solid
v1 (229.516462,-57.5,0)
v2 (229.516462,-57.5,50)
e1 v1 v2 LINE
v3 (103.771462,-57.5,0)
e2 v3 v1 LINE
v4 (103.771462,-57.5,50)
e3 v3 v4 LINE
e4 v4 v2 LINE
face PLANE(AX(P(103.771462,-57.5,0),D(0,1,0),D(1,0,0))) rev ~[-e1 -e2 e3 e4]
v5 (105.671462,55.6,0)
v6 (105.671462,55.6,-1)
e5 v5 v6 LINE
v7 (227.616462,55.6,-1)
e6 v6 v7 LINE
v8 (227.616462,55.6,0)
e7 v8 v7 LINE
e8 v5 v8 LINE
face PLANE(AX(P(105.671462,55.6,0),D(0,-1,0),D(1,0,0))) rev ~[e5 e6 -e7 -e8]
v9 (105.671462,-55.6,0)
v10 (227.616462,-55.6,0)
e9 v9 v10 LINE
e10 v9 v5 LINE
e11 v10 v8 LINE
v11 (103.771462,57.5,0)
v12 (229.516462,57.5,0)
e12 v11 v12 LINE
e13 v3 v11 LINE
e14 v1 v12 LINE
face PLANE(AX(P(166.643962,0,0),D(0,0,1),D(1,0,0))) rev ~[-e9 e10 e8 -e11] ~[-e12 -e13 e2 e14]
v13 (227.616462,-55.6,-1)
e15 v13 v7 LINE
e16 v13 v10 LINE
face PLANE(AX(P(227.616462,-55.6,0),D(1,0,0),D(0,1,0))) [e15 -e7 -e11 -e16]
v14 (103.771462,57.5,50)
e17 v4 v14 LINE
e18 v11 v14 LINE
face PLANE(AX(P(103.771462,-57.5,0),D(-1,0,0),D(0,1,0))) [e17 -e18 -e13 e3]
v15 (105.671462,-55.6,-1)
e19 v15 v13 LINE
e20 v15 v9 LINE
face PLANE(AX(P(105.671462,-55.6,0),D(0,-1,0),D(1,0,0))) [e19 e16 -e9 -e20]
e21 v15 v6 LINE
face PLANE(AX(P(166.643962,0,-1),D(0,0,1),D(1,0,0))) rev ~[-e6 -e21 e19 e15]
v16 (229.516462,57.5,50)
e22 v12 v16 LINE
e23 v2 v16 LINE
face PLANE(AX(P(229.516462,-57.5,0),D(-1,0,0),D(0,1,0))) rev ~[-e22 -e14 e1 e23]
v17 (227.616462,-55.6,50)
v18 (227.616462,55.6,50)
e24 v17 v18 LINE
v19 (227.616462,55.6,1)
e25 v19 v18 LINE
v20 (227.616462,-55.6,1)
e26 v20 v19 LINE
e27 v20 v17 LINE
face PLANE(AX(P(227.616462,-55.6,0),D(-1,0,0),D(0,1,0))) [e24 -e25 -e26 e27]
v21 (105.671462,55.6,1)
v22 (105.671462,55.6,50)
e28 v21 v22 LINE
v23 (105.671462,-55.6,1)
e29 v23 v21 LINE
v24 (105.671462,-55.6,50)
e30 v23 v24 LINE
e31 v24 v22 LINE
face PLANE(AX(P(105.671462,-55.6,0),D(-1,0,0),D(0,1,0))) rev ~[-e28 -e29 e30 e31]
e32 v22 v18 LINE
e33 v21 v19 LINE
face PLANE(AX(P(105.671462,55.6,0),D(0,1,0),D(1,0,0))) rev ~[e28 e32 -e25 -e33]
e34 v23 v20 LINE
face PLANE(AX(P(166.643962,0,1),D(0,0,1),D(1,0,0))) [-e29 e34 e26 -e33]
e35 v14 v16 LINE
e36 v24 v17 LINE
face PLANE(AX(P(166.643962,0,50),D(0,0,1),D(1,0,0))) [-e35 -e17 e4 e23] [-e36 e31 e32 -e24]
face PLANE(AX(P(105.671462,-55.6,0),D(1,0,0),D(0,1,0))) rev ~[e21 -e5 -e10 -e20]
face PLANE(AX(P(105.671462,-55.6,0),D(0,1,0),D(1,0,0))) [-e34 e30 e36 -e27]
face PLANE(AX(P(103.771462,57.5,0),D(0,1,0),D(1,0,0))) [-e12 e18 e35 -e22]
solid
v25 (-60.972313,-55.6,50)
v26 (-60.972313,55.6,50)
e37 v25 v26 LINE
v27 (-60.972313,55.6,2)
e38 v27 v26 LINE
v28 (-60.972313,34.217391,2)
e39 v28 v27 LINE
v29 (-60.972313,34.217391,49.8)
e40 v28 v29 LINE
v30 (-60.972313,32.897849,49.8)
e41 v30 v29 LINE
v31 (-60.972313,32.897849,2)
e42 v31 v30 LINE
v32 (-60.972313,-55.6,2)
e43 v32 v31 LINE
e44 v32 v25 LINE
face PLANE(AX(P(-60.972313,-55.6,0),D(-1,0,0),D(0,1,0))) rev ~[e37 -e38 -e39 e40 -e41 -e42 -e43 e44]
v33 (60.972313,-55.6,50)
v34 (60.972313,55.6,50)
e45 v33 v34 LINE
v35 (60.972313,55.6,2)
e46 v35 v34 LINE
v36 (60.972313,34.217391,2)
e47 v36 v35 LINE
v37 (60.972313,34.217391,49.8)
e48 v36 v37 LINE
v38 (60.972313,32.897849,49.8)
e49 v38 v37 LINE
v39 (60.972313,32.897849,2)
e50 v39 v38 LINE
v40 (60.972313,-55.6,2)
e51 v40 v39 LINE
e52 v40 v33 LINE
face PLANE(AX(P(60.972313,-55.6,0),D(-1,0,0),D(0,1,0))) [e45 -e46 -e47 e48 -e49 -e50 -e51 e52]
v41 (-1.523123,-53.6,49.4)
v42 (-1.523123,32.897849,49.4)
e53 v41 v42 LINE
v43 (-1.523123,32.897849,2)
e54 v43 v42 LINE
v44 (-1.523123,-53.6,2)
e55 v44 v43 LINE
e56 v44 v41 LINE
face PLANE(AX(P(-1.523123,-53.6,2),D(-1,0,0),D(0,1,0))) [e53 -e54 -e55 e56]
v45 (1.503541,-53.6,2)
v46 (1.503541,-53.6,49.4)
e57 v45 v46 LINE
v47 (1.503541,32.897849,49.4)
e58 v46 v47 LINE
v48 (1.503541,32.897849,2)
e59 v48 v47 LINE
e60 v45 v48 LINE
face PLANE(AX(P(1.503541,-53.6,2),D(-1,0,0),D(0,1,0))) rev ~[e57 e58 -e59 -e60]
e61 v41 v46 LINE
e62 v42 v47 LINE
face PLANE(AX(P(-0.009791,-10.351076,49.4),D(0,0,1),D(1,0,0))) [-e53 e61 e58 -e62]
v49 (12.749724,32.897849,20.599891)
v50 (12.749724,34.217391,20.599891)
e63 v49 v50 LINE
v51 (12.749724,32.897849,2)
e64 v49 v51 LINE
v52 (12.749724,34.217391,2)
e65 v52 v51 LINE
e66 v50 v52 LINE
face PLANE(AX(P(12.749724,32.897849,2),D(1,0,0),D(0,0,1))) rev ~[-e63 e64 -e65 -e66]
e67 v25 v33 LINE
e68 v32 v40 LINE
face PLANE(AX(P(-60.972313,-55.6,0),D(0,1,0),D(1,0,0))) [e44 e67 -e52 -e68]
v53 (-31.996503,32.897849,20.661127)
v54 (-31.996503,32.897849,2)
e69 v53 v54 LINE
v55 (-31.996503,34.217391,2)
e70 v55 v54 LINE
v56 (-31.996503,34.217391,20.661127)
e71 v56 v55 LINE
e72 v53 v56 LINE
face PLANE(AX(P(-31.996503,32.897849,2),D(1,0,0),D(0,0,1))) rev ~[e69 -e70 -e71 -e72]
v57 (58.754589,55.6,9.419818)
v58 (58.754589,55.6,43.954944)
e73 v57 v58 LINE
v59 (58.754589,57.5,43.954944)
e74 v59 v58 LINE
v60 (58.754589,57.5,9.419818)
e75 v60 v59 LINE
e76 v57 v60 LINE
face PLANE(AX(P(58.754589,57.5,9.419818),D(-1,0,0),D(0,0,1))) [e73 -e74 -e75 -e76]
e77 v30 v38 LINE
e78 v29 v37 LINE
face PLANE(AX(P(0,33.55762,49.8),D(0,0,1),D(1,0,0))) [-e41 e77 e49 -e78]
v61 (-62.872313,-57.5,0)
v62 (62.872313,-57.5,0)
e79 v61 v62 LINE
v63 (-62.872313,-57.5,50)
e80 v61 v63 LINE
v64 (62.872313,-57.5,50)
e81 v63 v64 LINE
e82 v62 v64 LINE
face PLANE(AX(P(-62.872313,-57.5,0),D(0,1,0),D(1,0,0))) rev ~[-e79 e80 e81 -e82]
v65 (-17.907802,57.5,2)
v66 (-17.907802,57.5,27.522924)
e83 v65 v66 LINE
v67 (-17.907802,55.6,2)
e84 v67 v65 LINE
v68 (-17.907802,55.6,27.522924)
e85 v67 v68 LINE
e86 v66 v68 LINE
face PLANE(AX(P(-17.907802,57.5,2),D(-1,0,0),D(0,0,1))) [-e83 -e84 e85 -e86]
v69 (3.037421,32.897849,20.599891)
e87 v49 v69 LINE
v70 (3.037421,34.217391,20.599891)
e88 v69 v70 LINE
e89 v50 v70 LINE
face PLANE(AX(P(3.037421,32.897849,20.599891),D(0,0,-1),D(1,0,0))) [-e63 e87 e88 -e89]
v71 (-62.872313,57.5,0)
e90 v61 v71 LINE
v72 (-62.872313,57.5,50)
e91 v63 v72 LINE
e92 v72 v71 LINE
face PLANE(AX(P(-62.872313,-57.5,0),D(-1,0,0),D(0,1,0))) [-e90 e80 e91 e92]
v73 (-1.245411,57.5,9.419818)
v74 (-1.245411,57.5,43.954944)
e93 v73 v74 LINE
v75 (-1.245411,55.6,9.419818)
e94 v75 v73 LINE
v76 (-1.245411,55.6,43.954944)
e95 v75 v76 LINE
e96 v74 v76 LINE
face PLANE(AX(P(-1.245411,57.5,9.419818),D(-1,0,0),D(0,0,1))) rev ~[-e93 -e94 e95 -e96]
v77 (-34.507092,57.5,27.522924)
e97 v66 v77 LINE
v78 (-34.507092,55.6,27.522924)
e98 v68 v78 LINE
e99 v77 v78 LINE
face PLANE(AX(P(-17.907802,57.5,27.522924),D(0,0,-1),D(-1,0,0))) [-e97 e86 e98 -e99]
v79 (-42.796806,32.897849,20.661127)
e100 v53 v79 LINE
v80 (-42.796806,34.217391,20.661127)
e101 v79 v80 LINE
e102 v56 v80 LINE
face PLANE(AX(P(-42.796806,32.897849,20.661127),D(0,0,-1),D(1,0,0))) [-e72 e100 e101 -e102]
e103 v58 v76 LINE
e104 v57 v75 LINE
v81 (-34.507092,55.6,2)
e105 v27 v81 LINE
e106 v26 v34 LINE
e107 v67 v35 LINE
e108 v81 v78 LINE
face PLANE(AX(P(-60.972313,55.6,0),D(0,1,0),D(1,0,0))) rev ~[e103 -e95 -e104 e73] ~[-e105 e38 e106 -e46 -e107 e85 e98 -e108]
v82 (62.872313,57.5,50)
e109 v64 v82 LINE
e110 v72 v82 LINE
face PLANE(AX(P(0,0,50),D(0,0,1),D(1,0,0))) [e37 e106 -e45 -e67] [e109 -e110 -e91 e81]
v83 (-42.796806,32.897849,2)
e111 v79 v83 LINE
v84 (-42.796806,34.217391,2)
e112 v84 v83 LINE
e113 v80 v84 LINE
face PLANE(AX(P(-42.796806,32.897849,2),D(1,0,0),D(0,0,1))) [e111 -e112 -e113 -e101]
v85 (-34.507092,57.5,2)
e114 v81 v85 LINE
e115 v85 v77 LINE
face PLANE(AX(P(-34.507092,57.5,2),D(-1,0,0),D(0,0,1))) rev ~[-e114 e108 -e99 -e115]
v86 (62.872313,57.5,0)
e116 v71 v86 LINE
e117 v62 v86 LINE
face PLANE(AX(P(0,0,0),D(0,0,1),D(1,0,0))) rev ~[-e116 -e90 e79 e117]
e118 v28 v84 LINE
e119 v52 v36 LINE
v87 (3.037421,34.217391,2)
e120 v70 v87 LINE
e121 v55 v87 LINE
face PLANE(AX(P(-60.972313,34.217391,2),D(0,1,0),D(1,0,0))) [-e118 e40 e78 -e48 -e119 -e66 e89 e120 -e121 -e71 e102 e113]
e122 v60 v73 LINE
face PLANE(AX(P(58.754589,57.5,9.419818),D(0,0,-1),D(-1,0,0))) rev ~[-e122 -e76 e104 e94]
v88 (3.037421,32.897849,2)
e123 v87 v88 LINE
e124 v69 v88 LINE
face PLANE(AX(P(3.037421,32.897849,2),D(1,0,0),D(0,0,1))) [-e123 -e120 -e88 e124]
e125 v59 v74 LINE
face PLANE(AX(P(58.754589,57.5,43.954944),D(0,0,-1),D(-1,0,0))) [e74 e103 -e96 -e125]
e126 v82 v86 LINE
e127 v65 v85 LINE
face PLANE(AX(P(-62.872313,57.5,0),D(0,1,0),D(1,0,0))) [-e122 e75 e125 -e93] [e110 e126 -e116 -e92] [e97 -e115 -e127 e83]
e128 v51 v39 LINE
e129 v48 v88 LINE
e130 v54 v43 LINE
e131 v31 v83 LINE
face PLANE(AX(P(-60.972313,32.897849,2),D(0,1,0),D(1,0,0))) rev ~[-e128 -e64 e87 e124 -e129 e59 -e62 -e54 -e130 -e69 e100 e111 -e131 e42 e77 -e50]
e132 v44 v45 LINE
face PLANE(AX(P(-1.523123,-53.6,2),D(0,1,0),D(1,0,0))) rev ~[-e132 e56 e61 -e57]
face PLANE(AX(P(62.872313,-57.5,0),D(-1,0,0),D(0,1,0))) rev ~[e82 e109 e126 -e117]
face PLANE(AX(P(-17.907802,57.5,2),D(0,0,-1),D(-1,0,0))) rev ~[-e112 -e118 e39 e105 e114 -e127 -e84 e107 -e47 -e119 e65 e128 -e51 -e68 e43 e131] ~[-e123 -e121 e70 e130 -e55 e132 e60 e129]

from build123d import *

# Parameters (mm, degrees)
F0_W      = 125.744625926
F0_H      = 115
F0_W_2    = 121.944625926
F0_H_2    = 111.2
F1_DEPTH  = 50
F2_DEPTH  = 2
F0_W_3    = 125.745
F0_W_4    = 121.945
F3_DEPTH  = 50
F4_DEPTH  = 1
F5_W      = 60
F5_H      = 34.5351266117
F6_DEPTH  = 12.5
F5_W_2    = 16.599290514
F5_H_2    = 25.5229242526
F8_W      = 121.944625926
F8_H      = 1.3195425272
F9_DEPTH  = 47.8
F10_W     = 10.8003032585
F10_H     = 18.6611273349
F11_DEPTH = 12.5
F10_W_2   = 9.7123030573
F10_H_2   = 18.5998911038
F13_W     = 3.026663198
F13_H     = 86.4978486359
F14_DEPTH = 47.4


# Not quite as in the source:
# - the program builds the solid bodies; features that only make, move or delete a surface that nothing else refers to are left out


with BuildPart() as f1:
    # F0 (on Top) → F1 (new body)
    with BuildSketch(Plane.XY):
        Rectangle(F0_W, F0_H)
        Rectangle(F0_W_2, F0_H_2, mode=Mode.SUBTRACT)
    extrude(amount=F1_DEPTH)

    # F0 (on Top) → F2 (join)
    with BuildSketch(Plane.XY):
        Rectangle(F0_W, F0_H)
        Rectangle(F0_W_2, F0_H_2, mode=Mode.SUBTRACT)
        Rectangle(F0_W_2, F0_H_2)
    extrude(amount=F2_DEPTH)


with BuildPart() as f3:
    # F0 (on Top) → F3 (new body)
    with BuildSketch(Plane.XY):
        with Locations((166.6439622641, 0)):
            Rectangle(F0_W_3, F0_H)
        with Locations((166.6439622641, 0)):
            Rectangle(F0_W_4, F0_H_2, mode=Mode.SUBTRACT)
    extrude(amount=F3_DEPTH)

    # F0 (on Top) → F4 (join, symmetric)
    with BuildSketch(Plane.XY):
        with Locations((166.6439622641, 0)):
            Rectangle(F0_W_4, F0_H_2)
    extrude(amount=F4_DEPTH, both=True)


with BuildPart() as f6:
    # F5 (on face) → F6 (new body, symmetric)
    with BuildSketch(Plane(origin=(0, 57.5, 0), x_dir=(-1, 0, 0), z_dir=(0, 1, 0))):
        with Locations((-28.7545890035, 26.6873809322)):
            Rectangle(F5_W, F5_H)
    extrude(amount=F6_DEPTH, both=True)


with BuildPart() as f6b:
    # F5 (on face) → F6, piece 2 (new body, symmetric)
    with BuildSketch(Plane(origin=(0, 57.5, 0), x_dir=(-1, 0, 0), z_dir=(0, 1, 0))):
        with Locations((26.2074469038, 14.7614621263)):
            Rectangle(F5_W_2, F5_H_2)
    extrude(amount=F6_DEPTH, both=True)


with BuildPart() as f1_1:
    add(f1.part)

    # F7: cut F6, F6b
    add(f6.part, mode=Mode.SUBTRACT)
    add(f6b.part, mode=Mode.SUBTRACT)

    # F8 (on face) → F9 (join)
    with BuildSketch(Plane.XY.offset(2)):
        with Locations((0, 33.5576198995)):
            Rectangle(F8_W, F8_H)
    extrude(amount=F9_DEPTH)


with BuildPart() as f11:
    # F10 (on face) → F11 (new body, symmetric)
    with BuildSketch(Plane.XZ.offset(-32.8978486359)):
        with Locations((-37.3966544867, 11.3305636675)):
            Rectangle(F10_W, F10_H)
    extrude(amount=F11_DEPTH, both=True)


with BuildPart() as f11b:
    # F10 (on face) → F11, piece 2 (new body, symmetric)
    with BuildSketch(Plane.XZ.offset(-32.8978486359)):
        with Locations((7.8935725614, 11.2999455519)):
            Rectangle(F10_W_2, F10_H_2)
    extrude(amount=F11_DEPTH, both=True)


with BuildPart() as f1_2:
    add(f1_1.part)

    # F12: cut F11, F11b
    add(f11.part, mode=Mode.SUBTRACT)
    add(f11b.part, mode=Mode.SUBTRACT)

    # F13 (on face) → F14 (join)
    with BuildSketch(Plane.XY.offset(2)):
        with Locations((-0.0097909417, -10.351075682)):
            Rectangle(F13_W, F13_H)
    extrude(amount=F14_DEPTH)


solid = Compound([f3.part, f1_2.part])
